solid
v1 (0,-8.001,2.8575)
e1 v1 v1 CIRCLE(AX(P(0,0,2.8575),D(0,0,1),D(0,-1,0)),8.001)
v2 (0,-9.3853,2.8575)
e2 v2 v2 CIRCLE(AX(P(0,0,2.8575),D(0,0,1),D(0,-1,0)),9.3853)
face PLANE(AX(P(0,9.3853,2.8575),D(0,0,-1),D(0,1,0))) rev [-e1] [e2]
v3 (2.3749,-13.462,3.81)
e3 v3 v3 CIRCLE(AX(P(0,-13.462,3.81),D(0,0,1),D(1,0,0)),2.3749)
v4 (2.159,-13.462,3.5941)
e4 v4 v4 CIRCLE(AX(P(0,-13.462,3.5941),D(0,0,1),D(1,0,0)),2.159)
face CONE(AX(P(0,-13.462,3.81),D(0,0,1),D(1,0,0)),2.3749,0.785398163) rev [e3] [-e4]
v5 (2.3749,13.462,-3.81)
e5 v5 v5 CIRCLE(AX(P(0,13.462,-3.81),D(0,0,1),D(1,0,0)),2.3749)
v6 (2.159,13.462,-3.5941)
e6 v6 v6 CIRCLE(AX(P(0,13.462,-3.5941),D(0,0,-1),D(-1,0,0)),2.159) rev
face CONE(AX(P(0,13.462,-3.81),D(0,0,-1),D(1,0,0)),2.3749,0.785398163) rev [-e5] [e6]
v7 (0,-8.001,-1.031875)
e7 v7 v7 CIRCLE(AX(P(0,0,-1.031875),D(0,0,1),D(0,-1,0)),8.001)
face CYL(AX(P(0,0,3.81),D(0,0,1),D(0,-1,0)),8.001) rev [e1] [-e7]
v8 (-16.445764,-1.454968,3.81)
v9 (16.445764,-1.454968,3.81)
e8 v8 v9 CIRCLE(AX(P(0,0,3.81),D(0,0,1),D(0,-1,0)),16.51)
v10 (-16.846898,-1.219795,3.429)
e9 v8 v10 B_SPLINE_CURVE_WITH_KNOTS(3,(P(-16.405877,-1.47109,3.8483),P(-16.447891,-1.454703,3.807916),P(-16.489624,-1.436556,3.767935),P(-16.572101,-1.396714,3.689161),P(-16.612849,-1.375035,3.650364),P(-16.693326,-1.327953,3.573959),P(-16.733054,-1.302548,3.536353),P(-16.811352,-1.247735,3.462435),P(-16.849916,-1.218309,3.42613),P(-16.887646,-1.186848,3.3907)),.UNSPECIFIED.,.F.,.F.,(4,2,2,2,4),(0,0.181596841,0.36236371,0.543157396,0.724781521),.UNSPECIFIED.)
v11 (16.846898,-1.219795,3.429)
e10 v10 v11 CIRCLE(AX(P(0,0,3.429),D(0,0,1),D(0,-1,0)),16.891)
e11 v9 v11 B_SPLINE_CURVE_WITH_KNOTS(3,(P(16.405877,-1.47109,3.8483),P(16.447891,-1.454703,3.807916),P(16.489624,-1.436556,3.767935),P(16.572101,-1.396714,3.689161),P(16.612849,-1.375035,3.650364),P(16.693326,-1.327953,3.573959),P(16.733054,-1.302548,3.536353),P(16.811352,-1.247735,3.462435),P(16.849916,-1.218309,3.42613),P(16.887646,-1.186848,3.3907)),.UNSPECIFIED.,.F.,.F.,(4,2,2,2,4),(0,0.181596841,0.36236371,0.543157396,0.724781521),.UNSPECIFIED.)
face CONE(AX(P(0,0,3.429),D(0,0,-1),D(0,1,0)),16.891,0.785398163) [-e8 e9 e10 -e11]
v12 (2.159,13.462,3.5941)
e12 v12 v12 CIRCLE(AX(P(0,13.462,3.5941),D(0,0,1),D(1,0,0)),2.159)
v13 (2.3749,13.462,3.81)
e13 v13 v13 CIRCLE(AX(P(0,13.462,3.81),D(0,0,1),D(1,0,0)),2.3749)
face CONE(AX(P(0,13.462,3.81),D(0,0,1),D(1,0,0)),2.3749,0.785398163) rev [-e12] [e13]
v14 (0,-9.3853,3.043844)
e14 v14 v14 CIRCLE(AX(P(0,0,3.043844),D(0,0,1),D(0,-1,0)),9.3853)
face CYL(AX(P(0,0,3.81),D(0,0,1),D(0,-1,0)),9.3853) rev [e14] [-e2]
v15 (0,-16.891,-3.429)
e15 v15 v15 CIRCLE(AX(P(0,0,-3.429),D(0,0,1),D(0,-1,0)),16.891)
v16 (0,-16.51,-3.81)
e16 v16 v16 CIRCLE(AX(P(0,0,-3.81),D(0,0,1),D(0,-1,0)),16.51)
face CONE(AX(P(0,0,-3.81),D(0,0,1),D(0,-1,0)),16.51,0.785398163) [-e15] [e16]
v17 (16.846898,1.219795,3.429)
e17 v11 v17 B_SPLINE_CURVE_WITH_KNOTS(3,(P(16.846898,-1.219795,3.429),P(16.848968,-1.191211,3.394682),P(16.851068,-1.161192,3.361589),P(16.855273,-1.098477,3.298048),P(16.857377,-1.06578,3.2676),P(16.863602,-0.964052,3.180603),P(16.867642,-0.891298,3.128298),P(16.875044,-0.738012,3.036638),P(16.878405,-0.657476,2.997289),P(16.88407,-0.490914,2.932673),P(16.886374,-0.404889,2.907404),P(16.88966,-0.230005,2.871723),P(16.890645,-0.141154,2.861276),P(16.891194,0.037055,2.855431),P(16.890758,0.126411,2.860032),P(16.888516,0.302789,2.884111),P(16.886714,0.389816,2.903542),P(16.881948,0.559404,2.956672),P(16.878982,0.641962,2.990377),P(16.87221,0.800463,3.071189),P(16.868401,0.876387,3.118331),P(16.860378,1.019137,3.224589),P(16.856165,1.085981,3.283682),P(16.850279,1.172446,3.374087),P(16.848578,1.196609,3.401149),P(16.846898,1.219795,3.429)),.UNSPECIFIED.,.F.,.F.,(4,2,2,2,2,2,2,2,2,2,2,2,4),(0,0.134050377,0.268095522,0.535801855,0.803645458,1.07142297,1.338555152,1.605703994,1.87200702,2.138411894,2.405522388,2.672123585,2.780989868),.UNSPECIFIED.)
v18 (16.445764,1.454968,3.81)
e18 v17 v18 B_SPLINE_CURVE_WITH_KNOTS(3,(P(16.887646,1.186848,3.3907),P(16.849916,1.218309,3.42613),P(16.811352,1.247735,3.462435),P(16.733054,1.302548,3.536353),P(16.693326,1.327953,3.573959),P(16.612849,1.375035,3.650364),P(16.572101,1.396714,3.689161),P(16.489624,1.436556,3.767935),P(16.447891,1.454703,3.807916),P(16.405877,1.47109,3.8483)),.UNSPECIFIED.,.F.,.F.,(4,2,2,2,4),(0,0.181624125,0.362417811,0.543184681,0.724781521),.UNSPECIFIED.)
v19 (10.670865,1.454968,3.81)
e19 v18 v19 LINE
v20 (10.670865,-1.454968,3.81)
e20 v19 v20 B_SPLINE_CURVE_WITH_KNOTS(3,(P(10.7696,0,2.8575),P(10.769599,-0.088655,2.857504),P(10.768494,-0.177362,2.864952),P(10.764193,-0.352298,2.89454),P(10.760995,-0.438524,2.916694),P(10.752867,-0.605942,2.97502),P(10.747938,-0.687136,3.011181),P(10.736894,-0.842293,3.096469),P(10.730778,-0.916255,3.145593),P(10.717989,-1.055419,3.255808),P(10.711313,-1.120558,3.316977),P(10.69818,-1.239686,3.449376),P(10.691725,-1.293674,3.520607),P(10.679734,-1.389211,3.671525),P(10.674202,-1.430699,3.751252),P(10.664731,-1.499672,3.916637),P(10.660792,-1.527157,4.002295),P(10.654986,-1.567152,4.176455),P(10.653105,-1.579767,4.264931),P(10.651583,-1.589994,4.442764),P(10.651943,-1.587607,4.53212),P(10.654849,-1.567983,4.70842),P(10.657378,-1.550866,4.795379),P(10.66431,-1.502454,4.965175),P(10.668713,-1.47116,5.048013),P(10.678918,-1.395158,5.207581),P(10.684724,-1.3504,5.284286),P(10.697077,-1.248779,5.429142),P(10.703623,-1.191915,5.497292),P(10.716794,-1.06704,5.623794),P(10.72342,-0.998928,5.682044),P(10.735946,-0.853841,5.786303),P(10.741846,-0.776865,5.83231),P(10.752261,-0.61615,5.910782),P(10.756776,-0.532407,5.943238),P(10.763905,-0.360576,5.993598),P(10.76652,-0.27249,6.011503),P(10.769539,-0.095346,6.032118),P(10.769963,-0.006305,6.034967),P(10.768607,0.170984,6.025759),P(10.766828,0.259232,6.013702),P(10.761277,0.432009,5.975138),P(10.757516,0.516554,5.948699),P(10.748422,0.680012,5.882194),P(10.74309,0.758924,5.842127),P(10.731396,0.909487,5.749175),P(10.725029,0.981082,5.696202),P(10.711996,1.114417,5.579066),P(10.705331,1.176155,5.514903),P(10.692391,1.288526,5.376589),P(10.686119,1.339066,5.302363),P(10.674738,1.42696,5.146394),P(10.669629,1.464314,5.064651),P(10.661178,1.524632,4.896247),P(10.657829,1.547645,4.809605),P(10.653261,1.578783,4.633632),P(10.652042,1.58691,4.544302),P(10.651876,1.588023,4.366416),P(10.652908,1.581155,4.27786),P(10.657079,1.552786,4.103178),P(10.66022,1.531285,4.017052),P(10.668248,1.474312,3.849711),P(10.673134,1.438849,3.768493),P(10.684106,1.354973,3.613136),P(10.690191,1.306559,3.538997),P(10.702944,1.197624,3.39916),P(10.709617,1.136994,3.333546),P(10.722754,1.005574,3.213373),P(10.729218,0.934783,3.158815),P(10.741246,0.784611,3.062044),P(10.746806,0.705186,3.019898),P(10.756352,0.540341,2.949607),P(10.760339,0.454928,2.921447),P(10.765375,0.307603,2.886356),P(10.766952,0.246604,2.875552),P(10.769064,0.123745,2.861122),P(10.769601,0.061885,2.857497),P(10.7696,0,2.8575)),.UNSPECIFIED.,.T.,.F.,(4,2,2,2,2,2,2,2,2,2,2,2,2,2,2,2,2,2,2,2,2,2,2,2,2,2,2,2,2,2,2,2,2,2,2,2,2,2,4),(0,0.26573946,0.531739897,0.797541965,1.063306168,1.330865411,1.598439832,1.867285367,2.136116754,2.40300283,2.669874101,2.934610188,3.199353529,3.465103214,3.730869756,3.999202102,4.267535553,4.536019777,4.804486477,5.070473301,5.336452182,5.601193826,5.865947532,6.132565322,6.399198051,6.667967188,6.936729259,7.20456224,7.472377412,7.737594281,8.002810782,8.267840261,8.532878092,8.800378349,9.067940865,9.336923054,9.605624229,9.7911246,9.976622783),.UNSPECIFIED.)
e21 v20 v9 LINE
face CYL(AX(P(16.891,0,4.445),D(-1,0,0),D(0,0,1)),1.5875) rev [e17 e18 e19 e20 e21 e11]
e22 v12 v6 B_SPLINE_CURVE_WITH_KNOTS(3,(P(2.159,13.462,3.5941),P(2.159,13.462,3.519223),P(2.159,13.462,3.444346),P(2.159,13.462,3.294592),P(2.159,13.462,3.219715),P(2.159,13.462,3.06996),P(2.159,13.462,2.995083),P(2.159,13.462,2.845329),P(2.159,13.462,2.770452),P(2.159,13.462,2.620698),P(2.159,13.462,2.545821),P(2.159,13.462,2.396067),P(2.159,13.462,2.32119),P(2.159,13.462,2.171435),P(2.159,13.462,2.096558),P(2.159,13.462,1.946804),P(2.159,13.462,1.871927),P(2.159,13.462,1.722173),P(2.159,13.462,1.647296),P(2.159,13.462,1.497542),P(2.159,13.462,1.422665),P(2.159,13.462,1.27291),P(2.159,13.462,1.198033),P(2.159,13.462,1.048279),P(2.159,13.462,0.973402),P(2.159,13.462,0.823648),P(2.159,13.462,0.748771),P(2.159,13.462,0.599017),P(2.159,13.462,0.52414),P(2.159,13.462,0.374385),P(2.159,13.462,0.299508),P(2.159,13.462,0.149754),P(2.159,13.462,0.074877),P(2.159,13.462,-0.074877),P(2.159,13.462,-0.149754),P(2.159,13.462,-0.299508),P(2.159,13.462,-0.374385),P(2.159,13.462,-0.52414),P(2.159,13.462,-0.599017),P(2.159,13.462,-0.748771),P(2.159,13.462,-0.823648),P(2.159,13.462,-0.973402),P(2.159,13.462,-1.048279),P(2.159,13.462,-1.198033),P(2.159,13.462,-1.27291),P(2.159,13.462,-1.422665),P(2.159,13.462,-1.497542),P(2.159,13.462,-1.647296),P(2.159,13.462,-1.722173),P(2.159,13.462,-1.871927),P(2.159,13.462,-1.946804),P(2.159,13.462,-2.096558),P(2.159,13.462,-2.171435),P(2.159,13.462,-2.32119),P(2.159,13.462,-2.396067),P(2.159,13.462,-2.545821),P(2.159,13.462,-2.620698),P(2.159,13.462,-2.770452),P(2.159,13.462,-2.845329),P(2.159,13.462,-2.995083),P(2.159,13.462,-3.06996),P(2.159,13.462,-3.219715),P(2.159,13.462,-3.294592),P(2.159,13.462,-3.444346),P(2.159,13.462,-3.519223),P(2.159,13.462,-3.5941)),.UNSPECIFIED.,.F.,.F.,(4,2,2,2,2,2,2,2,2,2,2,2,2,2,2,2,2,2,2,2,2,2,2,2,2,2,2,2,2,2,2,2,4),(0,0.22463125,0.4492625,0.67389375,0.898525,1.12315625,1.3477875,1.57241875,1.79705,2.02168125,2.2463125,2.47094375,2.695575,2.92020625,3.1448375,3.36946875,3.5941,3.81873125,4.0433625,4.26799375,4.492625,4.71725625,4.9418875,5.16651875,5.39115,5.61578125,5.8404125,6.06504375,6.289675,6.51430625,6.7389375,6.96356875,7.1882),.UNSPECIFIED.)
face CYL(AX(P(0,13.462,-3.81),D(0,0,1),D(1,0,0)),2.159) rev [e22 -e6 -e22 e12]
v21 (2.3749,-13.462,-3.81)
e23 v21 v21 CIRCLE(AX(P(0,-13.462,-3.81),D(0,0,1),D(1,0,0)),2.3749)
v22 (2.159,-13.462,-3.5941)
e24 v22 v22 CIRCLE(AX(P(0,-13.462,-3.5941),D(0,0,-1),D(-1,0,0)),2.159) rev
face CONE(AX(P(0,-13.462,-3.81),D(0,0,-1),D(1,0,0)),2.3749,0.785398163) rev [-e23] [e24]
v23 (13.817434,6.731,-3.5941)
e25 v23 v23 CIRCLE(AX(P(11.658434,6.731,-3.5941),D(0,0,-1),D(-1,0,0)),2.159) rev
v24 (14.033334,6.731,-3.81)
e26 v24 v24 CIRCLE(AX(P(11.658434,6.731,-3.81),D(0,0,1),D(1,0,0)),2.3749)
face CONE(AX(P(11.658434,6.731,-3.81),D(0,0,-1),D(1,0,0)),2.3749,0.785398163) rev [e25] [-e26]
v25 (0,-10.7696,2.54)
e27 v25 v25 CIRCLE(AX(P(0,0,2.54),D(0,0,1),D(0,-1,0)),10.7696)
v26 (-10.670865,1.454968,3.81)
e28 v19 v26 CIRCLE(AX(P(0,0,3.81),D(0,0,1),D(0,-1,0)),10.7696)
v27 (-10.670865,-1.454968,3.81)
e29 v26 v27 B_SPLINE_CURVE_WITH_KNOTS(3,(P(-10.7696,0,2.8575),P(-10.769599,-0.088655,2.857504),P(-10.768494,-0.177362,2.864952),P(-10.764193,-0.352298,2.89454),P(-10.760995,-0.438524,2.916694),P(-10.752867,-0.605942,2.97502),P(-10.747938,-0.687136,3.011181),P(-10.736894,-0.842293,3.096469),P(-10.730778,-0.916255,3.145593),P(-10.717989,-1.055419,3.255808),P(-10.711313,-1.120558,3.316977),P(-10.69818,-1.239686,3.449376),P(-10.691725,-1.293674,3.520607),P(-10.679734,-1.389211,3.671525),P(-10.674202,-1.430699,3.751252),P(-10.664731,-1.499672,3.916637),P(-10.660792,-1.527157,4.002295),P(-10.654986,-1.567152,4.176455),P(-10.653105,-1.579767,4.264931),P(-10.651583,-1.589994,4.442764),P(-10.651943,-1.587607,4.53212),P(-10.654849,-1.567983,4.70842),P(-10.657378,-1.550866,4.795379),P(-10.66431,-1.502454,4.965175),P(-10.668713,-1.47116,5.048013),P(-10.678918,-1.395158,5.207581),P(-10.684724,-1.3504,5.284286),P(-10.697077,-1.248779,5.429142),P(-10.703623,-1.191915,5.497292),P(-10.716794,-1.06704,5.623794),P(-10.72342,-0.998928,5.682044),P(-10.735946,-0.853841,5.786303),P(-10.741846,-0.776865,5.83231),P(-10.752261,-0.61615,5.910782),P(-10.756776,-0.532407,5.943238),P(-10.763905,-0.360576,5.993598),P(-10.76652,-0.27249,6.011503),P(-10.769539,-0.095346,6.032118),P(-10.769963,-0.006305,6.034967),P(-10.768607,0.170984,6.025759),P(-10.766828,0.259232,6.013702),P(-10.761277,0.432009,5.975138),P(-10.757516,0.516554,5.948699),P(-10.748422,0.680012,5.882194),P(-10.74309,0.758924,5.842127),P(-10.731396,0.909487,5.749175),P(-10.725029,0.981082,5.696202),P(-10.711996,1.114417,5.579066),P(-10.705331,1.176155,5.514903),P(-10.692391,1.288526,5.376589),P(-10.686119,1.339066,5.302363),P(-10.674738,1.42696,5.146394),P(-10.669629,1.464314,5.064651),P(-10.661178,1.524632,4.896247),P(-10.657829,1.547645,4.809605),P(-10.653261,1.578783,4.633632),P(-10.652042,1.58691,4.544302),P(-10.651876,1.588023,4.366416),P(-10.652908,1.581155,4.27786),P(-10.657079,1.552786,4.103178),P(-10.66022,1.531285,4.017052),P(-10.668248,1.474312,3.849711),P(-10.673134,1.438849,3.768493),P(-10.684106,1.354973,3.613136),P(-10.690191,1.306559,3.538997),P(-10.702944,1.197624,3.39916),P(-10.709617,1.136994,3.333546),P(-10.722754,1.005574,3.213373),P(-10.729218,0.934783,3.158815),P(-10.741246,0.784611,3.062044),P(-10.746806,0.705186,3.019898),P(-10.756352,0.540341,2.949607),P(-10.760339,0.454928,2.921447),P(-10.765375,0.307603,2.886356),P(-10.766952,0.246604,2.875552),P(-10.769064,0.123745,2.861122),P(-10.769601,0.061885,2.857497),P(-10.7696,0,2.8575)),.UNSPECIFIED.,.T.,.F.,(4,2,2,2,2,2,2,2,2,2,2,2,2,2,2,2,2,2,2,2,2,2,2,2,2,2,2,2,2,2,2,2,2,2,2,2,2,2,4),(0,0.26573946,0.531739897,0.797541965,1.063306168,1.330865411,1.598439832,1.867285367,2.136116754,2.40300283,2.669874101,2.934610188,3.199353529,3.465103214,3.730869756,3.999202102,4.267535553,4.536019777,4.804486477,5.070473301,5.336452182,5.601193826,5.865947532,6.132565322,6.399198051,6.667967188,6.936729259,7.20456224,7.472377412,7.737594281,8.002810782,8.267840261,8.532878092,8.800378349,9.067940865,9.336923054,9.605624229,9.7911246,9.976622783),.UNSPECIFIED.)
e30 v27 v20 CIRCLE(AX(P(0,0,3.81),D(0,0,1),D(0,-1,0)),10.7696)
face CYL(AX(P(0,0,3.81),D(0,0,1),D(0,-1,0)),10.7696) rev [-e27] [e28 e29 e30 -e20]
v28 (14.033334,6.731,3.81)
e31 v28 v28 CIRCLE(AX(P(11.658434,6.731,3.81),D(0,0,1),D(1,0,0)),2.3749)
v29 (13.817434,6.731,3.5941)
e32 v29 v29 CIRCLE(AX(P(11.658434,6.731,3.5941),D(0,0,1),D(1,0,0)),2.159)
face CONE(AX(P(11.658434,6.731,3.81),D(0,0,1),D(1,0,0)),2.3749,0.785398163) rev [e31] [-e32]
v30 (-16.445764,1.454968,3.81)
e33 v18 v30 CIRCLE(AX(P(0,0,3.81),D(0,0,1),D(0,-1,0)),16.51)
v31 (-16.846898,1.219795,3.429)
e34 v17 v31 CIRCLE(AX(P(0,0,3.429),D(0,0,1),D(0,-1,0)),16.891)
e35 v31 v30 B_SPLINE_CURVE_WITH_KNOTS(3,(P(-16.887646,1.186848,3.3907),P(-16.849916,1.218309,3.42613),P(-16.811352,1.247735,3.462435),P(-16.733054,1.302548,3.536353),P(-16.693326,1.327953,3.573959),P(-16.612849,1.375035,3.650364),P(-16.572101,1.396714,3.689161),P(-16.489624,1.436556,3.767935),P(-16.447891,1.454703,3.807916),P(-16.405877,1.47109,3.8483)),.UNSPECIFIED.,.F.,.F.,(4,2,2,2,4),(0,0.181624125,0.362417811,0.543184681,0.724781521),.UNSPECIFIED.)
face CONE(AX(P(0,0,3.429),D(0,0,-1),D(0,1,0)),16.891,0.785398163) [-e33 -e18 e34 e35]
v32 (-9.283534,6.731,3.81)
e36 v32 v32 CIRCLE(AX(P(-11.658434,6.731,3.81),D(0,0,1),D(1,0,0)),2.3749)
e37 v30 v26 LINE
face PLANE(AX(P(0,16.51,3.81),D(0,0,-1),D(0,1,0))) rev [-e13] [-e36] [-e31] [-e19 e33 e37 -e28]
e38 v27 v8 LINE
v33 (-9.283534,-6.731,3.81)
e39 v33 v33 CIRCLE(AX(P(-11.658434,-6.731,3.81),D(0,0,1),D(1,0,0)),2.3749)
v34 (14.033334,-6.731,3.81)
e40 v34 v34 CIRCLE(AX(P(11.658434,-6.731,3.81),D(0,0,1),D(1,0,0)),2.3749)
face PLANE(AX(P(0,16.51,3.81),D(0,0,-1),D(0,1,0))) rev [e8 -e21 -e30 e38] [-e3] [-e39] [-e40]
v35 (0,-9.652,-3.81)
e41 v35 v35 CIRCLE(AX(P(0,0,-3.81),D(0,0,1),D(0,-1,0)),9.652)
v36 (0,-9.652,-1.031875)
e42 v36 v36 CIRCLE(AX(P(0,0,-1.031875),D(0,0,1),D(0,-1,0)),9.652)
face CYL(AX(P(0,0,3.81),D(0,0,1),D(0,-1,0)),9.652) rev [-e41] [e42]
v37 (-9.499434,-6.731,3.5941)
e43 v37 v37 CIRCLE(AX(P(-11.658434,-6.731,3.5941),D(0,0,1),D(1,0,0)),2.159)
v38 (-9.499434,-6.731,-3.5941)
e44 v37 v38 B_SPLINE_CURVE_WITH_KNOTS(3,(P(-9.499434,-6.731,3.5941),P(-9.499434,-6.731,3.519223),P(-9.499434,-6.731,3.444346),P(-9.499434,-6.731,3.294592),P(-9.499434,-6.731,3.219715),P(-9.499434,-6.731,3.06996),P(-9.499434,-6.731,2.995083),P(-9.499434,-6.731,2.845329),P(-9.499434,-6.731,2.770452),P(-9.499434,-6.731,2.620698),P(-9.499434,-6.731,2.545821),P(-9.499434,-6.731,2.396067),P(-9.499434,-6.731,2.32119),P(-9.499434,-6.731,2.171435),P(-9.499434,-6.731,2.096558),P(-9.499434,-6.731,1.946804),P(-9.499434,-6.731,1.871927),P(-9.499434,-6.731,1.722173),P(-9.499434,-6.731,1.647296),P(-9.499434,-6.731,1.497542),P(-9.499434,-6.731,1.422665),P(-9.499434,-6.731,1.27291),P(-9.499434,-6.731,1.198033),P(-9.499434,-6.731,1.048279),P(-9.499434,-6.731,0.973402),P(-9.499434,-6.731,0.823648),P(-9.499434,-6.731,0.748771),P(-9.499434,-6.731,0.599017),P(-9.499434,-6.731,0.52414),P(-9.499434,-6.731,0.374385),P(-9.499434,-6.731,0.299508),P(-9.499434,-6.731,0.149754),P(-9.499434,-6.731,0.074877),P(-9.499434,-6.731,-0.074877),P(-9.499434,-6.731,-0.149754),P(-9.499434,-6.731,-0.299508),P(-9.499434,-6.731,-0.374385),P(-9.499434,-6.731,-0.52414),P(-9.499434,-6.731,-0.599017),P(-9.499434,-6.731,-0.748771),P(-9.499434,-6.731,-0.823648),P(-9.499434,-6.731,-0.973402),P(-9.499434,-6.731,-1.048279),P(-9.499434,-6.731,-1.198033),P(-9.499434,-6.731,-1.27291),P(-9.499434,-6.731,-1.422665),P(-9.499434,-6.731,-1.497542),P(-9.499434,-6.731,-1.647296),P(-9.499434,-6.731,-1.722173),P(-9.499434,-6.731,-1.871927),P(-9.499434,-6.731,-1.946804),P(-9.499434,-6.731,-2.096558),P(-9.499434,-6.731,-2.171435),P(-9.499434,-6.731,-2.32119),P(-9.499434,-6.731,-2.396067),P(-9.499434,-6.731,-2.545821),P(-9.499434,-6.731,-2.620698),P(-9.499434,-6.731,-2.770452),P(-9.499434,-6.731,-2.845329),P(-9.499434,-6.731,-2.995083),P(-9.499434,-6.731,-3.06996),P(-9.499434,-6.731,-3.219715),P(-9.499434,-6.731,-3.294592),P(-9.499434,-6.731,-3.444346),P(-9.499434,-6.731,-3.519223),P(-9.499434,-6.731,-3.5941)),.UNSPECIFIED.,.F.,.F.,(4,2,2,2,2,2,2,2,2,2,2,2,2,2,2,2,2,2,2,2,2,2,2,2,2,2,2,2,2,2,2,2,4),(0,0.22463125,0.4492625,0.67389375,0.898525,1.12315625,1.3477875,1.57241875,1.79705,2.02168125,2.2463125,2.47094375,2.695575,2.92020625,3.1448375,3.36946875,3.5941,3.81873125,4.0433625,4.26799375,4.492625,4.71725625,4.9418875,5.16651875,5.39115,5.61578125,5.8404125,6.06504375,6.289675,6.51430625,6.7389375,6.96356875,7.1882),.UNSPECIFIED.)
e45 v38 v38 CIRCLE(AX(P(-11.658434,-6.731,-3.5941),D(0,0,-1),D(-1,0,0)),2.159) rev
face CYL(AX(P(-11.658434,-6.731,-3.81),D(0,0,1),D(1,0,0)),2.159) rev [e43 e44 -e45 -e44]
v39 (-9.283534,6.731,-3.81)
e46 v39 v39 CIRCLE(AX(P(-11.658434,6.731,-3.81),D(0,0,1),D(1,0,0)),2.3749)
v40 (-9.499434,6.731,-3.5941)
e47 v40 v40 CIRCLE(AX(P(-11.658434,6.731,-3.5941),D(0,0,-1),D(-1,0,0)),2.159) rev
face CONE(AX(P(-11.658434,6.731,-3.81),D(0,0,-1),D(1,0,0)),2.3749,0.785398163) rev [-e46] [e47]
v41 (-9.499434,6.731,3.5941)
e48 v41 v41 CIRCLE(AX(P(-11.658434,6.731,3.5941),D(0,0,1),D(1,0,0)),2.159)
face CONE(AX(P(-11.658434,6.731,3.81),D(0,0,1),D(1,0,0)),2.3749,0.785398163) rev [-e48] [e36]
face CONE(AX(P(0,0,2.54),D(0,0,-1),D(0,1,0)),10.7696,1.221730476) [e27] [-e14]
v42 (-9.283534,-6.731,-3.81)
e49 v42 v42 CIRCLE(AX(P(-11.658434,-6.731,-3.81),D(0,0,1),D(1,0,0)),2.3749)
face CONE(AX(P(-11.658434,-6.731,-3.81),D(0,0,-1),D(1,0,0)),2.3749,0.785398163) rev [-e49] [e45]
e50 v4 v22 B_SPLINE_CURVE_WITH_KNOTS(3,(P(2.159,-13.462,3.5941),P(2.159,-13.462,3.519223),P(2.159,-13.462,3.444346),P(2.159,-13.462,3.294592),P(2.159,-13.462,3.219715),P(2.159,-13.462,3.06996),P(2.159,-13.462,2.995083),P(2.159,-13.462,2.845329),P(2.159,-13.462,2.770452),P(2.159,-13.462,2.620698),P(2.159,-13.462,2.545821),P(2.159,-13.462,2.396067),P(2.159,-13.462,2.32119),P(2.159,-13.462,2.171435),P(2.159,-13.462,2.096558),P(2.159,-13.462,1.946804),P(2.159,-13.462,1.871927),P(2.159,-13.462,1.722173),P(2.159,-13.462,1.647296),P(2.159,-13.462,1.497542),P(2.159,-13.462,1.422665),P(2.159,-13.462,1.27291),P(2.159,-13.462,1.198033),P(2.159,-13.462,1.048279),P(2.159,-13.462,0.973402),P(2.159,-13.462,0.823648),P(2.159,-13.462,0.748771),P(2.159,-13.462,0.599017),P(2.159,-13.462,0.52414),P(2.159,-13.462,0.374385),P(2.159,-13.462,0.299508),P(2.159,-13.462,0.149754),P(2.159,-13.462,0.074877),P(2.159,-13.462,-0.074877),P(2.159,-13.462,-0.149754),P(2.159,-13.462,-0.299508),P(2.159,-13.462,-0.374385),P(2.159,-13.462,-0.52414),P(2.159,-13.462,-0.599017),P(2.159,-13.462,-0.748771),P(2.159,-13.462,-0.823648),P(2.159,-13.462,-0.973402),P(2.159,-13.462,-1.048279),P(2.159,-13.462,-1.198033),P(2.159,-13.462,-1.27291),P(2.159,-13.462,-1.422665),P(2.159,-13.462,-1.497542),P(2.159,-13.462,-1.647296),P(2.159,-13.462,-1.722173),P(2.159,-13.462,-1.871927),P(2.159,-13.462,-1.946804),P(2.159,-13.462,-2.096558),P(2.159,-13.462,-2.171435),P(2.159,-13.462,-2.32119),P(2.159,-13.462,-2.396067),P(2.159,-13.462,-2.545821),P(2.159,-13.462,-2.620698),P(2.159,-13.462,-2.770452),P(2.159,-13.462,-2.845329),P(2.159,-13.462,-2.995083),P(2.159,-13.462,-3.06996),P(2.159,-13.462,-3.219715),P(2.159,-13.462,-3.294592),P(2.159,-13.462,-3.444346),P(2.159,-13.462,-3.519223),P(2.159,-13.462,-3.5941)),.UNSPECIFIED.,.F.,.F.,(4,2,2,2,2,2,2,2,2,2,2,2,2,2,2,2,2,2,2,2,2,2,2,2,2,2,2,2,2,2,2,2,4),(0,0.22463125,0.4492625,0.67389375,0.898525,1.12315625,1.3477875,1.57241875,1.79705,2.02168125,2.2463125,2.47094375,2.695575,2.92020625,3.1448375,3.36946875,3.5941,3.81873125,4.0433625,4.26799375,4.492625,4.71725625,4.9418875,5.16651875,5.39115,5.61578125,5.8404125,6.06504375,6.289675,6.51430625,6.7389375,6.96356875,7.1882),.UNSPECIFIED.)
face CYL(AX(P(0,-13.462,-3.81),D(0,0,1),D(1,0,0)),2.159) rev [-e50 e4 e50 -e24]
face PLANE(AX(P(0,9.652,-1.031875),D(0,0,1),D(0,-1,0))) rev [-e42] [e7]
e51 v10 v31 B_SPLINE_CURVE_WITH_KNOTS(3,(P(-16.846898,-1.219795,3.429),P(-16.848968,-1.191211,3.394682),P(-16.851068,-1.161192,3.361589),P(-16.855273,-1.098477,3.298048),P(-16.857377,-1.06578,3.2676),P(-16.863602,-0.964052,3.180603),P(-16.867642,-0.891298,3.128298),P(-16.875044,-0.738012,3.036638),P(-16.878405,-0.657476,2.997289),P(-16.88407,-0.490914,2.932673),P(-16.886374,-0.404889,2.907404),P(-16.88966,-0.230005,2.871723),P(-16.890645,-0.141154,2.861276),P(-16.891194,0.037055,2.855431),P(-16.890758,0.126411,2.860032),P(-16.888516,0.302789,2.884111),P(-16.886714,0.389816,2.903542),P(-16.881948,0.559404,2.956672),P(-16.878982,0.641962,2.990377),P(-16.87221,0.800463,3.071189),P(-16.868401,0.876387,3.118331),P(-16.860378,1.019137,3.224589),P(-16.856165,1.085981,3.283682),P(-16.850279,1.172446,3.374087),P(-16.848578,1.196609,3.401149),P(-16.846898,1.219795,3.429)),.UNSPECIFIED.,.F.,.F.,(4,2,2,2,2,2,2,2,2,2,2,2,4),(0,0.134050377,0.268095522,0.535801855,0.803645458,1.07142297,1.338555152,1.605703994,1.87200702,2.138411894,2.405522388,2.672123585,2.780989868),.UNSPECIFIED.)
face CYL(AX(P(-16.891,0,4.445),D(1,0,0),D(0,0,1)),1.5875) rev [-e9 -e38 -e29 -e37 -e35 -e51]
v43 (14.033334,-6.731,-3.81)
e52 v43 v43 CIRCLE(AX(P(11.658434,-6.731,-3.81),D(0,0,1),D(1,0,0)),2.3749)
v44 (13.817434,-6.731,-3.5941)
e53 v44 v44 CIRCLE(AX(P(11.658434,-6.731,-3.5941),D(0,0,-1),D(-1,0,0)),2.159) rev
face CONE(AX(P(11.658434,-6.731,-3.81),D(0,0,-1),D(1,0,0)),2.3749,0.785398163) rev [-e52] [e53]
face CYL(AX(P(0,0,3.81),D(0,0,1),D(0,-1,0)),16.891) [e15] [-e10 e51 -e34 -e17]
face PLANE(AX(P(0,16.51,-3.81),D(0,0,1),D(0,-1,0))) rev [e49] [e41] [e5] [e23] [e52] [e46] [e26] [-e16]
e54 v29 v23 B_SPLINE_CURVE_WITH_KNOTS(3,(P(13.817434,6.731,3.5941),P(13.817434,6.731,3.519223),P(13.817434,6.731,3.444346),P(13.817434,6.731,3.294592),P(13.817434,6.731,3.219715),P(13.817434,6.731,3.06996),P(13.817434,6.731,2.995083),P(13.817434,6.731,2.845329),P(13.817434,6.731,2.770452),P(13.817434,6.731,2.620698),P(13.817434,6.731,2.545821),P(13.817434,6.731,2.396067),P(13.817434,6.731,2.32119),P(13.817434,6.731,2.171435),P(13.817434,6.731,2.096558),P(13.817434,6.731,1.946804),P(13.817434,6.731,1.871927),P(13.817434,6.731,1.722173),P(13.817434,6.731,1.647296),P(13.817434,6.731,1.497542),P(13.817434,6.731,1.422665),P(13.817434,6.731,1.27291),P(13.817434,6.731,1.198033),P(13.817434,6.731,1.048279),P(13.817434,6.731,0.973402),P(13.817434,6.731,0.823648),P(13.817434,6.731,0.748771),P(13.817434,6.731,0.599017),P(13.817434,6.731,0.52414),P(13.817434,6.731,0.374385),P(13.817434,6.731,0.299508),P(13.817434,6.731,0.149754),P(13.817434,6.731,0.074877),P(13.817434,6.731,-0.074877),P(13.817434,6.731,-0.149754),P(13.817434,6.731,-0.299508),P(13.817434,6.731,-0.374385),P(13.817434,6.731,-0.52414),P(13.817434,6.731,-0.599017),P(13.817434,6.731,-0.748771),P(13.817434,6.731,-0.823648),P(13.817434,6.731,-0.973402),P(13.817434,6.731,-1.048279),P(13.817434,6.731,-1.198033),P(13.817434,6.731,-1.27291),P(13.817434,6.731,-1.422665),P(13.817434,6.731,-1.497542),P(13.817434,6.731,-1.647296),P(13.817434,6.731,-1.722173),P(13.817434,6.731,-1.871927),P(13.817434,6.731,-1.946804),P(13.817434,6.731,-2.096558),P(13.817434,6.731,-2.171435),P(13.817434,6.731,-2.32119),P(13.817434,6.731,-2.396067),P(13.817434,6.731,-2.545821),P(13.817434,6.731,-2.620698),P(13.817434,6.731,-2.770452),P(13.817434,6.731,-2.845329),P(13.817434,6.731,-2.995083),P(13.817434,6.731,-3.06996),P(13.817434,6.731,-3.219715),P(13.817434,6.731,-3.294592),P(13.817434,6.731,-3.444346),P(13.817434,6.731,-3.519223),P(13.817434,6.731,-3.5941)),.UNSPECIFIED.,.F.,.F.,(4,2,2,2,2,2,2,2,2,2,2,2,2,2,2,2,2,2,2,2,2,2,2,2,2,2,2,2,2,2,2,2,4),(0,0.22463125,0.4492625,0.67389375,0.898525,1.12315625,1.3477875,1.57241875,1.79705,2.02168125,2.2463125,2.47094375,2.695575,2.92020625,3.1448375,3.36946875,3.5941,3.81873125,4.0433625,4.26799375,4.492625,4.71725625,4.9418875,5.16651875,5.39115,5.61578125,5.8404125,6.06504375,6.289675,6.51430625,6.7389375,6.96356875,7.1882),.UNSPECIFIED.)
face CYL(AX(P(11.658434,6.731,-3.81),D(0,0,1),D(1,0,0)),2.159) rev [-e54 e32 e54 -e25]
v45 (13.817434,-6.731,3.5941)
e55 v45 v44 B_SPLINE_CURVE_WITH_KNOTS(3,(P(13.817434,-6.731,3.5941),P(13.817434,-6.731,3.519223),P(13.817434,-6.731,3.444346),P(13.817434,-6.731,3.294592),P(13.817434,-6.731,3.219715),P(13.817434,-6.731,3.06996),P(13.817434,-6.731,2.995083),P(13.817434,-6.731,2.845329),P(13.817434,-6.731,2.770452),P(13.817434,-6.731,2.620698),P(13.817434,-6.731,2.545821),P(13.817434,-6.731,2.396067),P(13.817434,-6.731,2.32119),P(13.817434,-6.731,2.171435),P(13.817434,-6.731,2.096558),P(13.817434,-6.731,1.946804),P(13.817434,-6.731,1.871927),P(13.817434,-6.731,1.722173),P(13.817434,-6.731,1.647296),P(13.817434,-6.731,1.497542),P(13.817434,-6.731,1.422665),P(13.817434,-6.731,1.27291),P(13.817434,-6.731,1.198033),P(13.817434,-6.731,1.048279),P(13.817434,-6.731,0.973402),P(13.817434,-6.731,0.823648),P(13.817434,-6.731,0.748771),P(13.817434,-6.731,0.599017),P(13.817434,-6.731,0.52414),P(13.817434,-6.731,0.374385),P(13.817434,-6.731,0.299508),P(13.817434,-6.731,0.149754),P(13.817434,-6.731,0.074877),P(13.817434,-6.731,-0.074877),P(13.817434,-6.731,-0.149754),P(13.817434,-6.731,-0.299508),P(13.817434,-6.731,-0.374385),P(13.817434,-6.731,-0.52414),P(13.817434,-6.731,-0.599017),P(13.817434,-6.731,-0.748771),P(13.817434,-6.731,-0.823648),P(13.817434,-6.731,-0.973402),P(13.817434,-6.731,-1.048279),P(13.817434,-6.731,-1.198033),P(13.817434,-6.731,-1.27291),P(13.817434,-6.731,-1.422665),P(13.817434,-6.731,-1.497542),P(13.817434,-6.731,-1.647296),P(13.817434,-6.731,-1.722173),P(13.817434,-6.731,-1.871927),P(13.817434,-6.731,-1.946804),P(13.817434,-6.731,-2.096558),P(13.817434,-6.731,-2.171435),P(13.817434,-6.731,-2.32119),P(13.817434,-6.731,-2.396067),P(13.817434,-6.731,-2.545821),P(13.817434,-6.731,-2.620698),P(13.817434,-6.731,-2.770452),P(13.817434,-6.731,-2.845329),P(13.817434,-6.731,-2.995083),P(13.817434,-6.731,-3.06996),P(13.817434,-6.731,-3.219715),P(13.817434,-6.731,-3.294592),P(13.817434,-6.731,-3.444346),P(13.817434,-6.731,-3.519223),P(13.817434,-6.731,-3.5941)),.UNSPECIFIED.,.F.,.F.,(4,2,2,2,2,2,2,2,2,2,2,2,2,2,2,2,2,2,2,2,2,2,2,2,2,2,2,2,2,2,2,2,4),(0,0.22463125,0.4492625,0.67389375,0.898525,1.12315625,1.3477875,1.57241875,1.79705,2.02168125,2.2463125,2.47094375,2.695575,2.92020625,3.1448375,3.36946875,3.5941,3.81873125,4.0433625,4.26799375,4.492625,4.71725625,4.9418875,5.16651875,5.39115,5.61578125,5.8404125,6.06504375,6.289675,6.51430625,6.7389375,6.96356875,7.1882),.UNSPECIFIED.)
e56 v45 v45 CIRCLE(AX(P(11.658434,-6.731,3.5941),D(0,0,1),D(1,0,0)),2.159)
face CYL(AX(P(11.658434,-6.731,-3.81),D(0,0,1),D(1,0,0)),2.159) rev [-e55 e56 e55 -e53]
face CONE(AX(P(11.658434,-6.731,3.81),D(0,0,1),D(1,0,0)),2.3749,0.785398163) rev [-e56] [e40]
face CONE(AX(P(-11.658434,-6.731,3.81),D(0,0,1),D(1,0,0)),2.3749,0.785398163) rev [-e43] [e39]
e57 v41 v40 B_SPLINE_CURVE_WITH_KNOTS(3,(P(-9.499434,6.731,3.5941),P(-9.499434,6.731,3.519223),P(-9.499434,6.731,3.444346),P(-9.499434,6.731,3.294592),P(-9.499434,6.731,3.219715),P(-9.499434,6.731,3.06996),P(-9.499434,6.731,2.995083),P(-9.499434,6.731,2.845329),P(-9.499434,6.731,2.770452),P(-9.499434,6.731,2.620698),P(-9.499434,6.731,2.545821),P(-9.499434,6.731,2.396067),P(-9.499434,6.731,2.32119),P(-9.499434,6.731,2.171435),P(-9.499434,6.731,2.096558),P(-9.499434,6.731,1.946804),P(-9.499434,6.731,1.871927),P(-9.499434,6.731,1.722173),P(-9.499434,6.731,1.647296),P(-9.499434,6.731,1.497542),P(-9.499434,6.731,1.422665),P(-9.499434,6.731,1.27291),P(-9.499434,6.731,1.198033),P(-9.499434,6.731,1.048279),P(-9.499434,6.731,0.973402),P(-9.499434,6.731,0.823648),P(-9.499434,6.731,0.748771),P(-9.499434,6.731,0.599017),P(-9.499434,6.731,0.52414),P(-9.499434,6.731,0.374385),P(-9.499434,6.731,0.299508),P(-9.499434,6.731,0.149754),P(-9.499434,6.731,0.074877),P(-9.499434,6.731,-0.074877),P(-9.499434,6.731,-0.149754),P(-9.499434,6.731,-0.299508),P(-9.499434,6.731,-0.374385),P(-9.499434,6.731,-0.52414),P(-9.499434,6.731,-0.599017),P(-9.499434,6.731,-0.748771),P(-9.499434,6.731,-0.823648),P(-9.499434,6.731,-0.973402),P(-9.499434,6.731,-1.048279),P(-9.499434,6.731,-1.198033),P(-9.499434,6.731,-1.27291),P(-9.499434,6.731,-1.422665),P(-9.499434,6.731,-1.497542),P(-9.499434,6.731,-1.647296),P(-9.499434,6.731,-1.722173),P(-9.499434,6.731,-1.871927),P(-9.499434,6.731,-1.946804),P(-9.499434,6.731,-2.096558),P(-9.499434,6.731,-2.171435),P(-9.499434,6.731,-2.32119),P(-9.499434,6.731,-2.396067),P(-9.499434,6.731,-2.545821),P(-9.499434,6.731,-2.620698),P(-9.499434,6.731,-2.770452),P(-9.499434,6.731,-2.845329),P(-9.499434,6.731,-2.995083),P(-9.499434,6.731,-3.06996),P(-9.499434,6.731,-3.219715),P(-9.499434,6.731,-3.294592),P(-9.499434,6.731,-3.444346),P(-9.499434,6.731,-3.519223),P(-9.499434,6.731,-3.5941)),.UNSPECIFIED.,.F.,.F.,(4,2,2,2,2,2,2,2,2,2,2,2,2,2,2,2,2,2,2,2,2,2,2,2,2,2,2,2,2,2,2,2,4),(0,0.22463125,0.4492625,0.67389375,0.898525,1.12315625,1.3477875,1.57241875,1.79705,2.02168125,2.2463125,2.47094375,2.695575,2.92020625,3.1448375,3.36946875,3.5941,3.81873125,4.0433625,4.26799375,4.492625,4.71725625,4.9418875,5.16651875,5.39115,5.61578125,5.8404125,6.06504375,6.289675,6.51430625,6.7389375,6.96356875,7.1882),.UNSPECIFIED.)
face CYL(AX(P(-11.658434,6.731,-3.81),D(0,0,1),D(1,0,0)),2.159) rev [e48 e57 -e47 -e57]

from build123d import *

# Parameters (mm, degrees)
SKETCH4_R          = 2.159
CUT_EXTRUDE1_DEPTH = 26.073415443
CUT_EXTRUDE2_START = 10.670865
SKETCH5_R          = 1.5875
CUT_EXTRUDE2_DEPTH = 6.220135


# Read off the part's stored shape, not the designer's step: Mirror2
with BuildPart() as part:
    # Sketch3 → Revolve1 (revolve)
    with BuildSketch(Plane(origin=(0, 0, 0), x_dir=(0, 0, -1), z_dir=(1, 0, 0)), mode=Mode.PRIVATE) as revolve1_sk:
        Polygon((-3.81, 16.51), (-3.81, 10.7696), (-2.54, 10.7696), (-3.043843995, 9.3853), (-2.8575, 9.3853), (-2.8575, 8.001), (1.031875, 8.001), (1.031875, 9.652), (3.81, 9.652), (3.81, 16.51), (3.429, 16.891), (-3.429, 16.891), align=None)
    revolve(revolve1_sk.sketch.rotate(Axis((0, 0, 3.81), (0, 0, -1)), 180), axis=Axis((0, 0, 3.81), (0, 0, -1)))

    # Sketch4 → Cut-Extrude1 (cut, through all)
    with BuildSketch(Plane.XY.offset(3.81)):
        with Locations((0, 13.462)):
            Circle(SKETCH4_R)
        with Locations((11.658433986, 6.731)):
            Circle(SKETCH4_R)
        with Locations((11.658433986, -6.731)):
            Circle(SKETCH4_R)
        with Locations((0, -13.462)):
            Circle(SKETCH4_R)
        with Locations((-11.658433986, -6.731)):
            Circle(SKETCH4_R)
        with Locations((-11.658433986, 6.731)):
            Circle(SKETCH4_R)
    extrude(amount=-CUT_EXTRUDE1_DEPTH, mode=Mode.SUBTRACT)

    # Sketch5 → Cut-Extrude2 (cut)
    with BuildSketch(Plane(origin=(0, 0, 0), x_dir=(0, 0, -1), z_dir=(1, 0, 0)).offset(CUT_EXTRUDE2_START)):
        with Locations((-4.445, 0)):
            Circle(SKETCH5_R)
    cut_extrude2 = extrude(amount=CUT_EXTRUDE2_DEPTH, mode=Mode.SUBTRACT)

    # Mirror1: Cut-Extrude2 across plane
    add(cut_extrude2.mirror(Plane(origin=(0, 0, 0), x_dir=(0, 0, 1), z_dir=(1, 0, 0))), mode=Mode.SUBTRACT)

    # Cut-Extrude3 cone 1 section (through the dimple's axis) → Cut-Extrude3 (revolve, cut)
    with BuildSketch(Plane(origin=(0, 13.462, 3.81), x_dir=(0, -1, 0), z_dir=(1, 0, 0))):
        Polygon((0, 0), (2.3749, 0), (0, 2.3749), align=None)
    revolve(axis=Axis((0, 13.462, 3.81), (0, 0, -1)), mode=Mode.SUBTRACT)

    # Cut-Extrude3 cone 2 section (through the dimple's axis) → Cut-Extrude3 cone 2 (revolve, cut)
    with BuildSketch(Plane(origin=(11.658433986, 6.731, 3.81), x_dir=(0, -1, 0), z_dir=(1, 0, 0))):
        Polygon((0, 0), (2.3749, 0), (0, 2.3749), align=None)
    revolve(axis=Axis((11.658433986, 6.731, 3.81), (0, 0, -1)), mode=Mode.SUBTRACT)

    # Cut-Extrude3 cone 3 section (through the dimple's axis) → Cut-Extrude3 cone 3 (revolve, cut)
    with BuildSketch(Plane(origin=(11.658433986, -6.731, 3.81), x_dir=(0, -1, 0), z_dir=(1, 0, 0))):
        Polygon((0, 0), (2.3749, 0), (0, 2.3749), align=None)
    revolve(axis=Axis((11.658433986, -6.731, 3.81), (0, 0, -1)), mode=Mode.SUBTRACT)

    # Cut-Extrude3 cone 4 section (through the dimple's axis) → Cut-Extrude3 cone 4 (revolve, cut)
    with BuildSketch(Plane(origin=(0, -13.462, 3.81), x_dir=(0, -1, 0), z_dir=(1, 0, 0))):
        Polygon((0, 0), (2.3749, 0), (0, 2.3749), align=None)
    revolve(axis=Axis((0, -13.462, 3.81), (0, 0, -1)), mode=Mode.SUBTRACT)

    # Cut-Extrude3 cone 5 section (through the dimple's axis) → Cut-Extrude3 cone 5 (revolve, cut)
    with BuildSketch(Plane(origin=(-11.658433986, -6.731, 3.81), x_dir=(0, -1, 0), z_dir=(1, 0, 0))):
        Polygon((0, 0), (2.3749, 0), (0, 2.3749), align=None)
    revolve(axis=Axis((-11.658433986, -6.731, 3.81), (0, 0, -1)), mode=Mode.SUBTRACT)

    # Cut-Extrude3 cone 6 section (through the dimple's axis) → Cut-Extrude3 cone 6 (revolve, cut)
    with BuildSketch(Plane(origin=(-11.658433986, 6.731, 3.81), x_dir=(0, -1, 0), z_dir=(1, 0, 0))):
        Polygon((0, 0), (2.3749, 0), (0, 2.3749), align=None)
    revolve(axis=Axis((-11.658433986, 6.731, 3.81), (0, 0, -1)), mode=Mode.SUBTRACT)

    # Mirror2 outline → Mirror2 (revolve, cut)
    with BuildSketch(Plane.XZ.offset(-13.462)):
        Polygon((2.3749, -3.81), (2.159, -3.5941), (2.159, -3.81), align=None)
    revolve(axis=Axis((0, 13.462, 0), (0, 0, 1)), mode=Mode.SUBTRACT)

    # Mirror2 2 outline → Mirror2 2 (revolve, cut)
    with BuildSketch(Plane(origin=(-11.658433986, 6.731, 0), x_dir=(1, 0, 0), z_dir=(0, -1, 0))):
        Polygon((2.3749, -3.81), (2.159, -3.5941), (2.159, -3.81), align=None)
    revolve(axis=Axis((-11.658433986, 6.731, 0), (0, 0, 1)), mode=Mode.SUBTRACT)

    # Mirror2 3 outline → Mirror2 3 (revolve, cut)
    with BuildSketch(Plane(origin=(-11.658433986, -6.731, 0), x_dir=(1, 0, 0), z_dir=(0, -1, 0))):
        Polygon((2.3749, -3.81), (2.159, -3.5941), (2.159, -3.81), align=None)
    revolve(axis=Axis((-11.658433986, -6.731, 0), (0, 0, 1)), mode=Mode.SUBTRACT)

    # Mirror2 4 outline → Mirror2 4 (revolve, cut)
    with BuildSketch(Plane.XZ.offset(13.462)):
        Polygon((2.3749, -3.81), (2.159, -3.5941), (2.159, -3.81), align=None)
    revolve(axis=Axis((0, -13.462, 0), (0, 0, 1)), mode=Mode.SUBTRACT)

    # Mirror2 5 outline → Mirror2 5 (revolve, cut)
    with BuildSketch(Plane(origin=(11.658433986, -6.731, 0), x_dir=(1, 0, 0), z_dir=(0, -1, 0))):
        Polygon((2.3749, -3.81), (2.159, -3.5941), (2.159, -3.81), align=None)
    revolve(axis=Axis((11.658433986, -6.731, 0), (0, 0, 1)), mode=Mode.SUBTRACT)

    # Mirror2 6 outline → Mirror2 6 (revolve, cut)
    with BuildSketch(Plane(origin=(11.658433986, 6.731, 0), x_dir=(1, 0, 0), z_dir=(0, -1, 0))):
        Polygon((2.3749, -3.81), (2.159, -3.5941), (2.159, -3.81), align=None)
    revolve(axis=Axis((11.658433986, 6.731, 0), (0, 0, 1)), mode=Mode.SUBTRACT)


solid = part.part
